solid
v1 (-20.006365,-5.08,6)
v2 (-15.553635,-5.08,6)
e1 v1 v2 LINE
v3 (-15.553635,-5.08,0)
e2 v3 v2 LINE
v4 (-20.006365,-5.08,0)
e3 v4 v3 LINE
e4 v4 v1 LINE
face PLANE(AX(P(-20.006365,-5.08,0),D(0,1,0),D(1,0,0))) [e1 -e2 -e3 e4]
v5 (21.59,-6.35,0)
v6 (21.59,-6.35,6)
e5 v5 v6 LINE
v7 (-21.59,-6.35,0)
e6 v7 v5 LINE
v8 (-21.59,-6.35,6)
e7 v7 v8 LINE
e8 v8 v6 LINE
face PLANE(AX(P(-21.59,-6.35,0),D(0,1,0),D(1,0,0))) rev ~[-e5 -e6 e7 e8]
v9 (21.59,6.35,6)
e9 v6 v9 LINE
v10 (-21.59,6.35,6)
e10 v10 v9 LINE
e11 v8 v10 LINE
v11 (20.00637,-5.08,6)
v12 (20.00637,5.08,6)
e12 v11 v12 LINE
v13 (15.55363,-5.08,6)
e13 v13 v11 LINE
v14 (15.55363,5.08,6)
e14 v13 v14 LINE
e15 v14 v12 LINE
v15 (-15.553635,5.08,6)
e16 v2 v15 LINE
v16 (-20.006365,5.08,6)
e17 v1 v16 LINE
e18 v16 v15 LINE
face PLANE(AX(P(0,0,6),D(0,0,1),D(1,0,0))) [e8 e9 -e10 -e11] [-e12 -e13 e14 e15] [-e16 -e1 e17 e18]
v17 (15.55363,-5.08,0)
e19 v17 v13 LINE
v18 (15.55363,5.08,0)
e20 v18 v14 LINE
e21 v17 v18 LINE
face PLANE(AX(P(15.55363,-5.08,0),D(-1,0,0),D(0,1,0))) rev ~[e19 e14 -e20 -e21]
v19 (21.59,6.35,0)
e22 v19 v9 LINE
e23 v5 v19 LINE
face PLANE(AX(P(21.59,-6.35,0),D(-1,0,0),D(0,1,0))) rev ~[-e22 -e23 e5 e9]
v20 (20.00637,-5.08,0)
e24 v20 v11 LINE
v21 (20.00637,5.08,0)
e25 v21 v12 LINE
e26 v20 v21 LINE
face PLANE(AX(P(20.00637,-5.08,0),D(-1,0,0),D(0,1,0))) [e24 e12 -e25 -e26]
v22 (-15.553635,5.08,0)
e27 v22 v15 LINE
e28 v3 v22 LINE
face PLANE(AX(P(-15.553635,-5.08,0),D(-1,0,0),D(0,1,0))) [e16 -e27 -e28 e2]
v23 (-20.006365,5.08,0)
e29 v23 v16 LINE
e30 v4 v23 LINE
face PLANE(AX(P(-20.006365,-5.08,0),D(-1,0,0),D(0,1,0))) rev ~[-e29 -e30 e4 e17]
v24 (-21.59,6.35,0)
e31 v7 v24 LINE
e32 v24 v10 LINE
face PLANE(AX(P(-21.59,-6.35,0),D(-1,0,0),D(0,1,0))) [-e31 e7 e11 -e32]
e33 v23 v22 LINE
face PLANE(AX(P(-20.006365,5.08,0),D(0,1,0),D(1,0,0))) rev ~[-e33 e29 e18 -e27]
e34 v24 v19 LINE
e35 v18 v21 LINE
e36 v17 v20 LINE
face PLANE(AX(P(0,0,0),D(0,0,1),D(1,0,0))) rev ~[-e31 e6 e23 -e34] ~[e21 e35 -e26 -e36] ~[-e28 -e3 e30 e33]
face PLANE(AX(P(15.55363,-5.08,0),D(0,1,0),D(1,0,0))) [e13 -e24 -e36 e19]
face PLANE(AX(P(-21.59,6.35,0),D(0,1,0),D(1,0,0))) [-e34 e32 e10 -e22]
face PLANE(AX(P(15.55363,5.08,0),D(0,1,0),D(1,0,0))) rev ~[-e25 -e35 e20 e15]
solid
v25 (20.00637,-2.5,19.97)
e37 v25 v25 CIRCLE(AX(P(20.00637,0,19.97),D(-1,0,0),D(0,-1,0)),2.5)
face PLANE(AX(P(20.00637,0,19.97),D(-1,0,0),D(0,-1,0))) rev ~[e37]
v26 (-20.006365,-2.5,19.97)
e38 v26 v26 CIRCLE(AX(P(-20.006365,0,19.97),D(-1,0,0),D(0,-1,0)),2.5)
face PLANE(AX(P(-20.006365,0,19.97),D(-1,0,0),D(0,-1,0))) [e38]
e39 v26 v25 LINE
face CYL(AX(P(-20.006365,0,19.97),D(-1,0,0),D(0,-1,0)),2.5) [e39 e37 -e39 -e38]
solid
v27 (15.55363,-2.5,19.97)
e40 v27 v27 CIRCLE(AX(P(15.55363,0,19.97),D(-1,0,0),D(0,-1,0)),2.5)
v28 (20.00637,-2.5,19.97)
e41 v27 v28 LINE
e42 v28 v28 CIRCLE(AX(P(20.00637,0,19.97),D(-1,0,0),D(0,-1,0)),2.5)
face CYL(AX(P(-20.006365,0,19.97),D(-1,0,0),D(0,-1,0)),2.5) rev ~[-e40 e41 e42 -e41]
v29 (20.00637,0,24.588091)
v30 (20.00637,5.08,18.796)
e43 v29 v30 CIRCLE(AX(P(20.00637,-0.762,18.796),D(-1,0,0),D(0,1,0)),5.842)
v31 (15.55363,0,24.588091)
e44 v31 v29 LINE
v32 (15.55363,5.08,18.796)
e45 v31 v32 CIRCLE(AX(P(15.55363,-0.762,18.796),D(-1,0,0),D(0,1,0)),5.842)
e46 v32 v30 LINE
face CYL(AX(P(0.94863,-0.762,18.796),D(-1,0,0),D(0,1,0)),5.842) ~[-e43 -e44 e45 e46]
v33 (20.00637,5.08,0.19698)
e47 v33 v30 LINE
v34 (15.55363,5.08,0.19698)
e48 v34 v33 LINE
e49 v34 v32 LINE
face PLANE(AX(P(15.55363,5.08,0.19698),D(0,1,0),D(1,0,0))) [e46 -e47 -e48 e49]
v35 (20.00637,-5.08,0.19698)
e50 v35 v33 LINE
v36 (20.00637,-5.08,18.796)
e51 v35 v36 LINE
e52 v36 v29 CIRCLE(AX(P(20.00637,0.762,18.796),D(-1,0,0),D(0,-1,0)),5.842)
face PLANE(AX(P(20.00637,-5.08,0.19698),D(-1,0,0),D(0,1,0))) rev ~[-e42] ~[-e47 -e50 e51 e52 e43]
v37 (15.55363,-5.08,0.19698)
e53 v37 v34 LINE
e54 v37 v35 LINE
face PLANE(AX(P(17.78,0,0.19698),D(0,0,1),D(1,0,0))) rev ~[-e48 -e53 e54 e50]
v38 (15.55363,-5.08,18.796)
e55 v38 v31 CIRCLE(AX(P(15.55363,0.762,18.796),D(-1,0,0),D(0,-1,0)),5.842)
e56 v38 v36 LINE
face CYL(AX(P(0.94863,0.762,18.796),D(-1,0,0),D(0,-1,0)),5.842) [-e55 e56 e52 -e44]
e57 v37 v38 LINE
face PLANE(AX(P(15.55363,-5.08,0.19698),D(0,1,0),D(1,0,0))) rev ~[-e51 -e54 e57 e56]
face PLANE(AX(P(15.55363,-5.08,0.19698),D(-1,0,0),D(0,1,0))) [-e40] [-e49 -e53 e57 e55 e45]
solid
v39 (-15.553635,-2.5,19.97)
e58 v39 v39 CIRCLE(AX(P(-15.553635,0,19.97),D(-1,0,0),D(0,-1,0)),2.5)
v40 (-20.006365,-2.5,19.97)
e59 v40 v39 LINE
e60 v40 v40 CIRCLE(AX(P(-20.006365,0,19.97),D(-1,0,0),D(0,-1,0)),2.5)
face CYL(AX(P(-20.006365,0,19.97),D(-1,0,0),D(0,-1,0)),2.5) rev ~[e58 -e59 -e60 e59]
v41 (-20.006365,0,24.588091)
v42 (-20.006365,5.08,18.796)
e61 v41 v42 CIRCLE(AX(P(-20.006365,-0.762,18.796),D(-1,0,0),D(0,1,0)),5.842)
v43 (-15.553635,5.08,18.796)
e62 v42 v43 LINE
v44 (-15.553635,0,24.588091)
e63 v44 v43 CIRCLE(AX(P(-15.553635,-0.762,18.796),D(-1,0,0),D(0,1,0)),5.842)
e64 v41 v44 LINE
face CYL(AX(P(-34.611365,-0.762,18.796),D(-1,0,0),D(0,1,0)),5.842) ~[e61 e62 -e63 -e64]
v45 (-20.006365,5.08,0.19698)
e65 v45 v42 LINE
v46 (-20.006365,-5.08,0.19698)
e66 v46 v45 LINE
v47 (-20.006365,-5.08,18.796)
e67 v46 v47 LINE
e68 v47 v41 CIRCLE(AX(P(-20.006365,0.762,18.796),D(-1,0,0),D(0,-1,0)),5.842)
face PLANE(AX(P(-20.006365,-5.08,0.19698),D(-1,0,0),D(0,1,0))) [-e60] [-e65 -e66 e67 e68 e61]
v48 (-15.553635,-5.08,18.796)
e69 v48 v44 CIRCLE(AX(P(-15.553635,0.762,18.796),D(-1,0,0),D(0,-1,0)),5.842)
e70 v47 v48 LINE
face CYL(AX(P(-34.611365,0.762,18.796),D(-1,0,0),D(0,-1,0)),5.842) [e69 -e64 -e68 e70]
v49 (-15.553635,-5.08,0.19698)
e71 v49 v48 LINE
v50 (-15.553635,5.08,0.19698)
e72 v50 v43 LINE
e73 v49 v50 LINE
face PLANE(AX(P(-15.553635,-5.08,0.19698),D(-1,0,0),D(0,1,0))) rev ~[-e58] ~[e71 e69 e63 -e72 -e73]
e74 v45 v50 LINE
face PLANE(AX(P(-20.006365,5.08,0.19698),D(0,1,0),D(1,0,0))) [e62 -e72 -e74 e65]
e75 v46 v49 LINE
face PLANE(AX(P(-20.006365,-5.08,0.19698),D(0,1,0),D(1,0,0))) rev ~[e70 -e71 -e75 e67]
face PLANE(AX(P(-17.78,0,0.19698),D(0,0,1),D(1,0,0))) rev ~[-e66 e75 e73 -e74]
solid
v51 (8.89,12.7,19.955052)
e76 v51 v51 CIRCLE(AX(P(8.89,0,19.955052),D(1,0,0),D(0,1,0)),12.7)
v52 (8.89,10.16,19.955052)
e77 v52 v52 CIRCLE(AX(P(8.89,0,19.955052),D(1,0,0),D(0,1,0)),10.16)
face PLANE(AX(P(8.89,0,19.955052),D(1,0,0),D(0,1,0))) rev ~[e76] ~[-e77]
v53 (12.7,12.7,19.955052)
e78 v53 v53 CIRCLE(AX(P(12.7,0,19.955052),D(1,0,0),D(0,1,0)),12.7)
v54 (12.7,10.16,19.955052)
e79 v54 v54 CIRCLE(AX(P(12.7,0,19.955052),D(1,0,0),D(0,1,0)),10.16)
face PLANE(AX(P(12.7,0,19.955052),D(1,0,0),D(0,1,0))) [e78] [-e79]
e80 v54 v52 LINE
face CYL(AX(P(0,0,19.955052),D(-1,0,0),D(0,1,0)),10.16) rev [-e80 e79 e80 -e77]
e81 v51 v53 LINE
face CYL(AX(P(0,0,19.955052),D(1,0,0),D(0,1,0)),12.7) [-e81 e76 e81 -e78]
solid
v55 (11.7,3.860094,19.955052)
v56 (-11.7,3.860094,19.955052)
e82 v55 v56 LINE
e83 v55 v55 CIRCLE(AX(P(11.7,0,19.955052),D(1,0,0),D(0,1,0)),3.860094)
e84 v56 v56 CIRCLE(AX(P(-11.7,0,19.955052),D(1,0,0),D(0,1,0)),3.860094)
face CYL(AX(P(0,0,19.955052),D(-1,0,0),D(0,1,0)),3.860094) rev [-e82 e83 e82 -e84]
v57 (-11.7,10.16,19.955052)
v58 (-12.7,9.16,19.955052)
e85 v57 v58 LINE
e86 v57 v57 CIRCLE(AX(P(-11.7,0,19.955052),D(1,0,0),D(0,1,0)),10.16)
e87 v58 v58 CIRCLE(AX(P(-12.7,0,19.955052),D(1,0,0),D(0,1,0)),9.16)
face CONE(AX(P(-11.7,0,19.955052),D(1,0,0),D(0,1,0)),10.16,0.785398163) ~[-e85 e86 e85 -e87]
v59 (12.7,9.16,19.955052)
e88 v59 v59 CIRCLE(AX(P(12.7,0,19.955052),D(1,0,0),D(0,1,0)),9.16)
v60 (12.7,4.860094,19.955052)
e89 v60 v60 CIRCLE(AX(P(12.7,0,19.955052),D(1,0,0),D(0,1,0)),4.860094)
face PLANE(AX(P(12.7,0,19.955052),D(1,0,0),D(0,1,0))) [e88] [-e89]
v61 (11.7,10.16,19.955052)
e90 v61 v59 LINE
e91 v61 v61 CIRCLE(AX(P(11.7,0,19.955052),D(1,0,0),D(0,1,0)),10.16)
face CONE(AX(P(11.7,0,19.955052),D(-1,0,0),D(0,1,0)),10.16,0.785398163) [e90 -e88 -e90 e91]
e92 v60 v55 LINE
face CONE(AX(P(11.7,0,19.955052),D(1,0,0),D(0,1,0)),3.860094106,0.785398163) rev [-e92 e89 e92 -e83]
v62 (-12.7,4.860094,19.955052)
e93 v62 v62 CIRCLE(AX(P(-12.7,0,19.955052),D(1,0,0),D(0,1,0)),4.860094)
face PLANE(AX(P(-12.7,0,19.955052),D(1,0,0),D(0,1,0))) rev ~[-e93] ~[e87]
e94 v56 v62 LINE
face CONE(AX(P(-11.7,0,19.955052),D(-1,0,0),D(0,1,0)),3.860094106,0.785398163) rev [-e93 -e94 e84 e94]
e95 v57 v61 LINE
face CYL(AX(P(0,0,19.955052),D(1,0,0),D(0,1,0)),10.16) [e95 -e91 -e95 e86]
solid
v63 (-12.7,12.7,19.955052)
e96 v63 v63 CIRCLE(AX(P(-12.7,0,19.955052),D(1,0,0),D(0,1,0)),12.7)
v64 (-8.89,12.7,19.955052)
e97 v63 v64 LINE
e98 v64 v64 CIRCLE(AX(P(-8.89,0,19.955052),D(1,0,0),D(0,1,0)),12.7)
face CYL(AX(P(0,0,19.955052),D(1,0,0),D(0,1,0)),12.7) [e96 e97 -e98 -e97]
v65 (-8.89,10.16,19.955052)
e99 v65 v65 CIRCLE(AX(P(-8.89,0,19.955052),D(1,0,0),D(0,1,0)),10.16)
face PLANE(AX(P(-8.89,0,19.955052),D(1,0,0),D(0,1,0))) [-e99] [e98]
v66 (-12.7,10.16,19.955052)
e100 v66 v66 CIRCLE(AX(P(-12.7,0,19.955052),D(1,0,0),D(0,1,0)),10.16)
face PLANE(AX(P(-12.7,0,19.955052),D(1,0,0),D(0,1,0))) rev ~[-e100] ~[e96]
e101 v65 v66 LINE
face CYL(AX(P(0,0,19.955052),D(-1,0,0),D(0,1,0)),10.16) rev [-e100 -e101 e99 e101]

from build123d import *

# Parameters (mm, degrees)
F0_W          = 43.18
F0_H          = 12.7
F0_W_2        = 4.4527295977
F0_H_2        = 10.16
F0_W_3        = 4.4527407736
F1_DEPTH      = 6
F2_START      = 0.19698
F2_DEPTH      = 24.44102
F3_T1_DEPTH   = 33.6627407736
F3_2_T1_DEPTH = 33.6627295977
F4_R          = 2.5
F5_DEPTH      = 40.0127351856
F6_DEPTH      = 40.0127351856
F7_R          = 12.7
F7_R_2        = 10.16
F8_DEPTH      = 12.7
F7_R_3        = 3.8600941061
F9_DEPTH      = 12.7
F10_DEPTH     = 8.89
F11_SIZE      = 1


# Not quite as in the source:
# - a fillet or chamfer that OpenCascade refuses, or shapes differently, is made with other operations: its cross-section is extruded or revolved along the edge and cut away or added


with BuildPart() as f1:
    # F0 (on Top) → F1 (new body)
    with BuildSketch(Plane.XY):
        Rectangle(F0_W, F0_H)
        with Locations((-17.78, 0)):
            Rectangle(F0_W_2, F0_H_2, mode=Mode.SUBTRACT)
        with Locations((17.78, 0)):
            Rectangle(F0_W_3, F0_H_2, mode=Mode.SUBTRACT)
    extrude(amount=F1_DEPTH)


with BuildPart() as f2:
    # F0 (on Top) → F2 (new body)
    with BuildSketch(Plane.XY.offset(F2_START)):
        with Locations((-17.78, 0)):
            Rectangle(F0_W_2, F0_H_2)
    extrude(amount=F2_DEPTH)

    # F3#2: fillet of radius 5.842 on 2 edges, made by hand

    # F3_2_s2 → F3_2_t1 (cut)
    with BuildSketch(Plane.YZ.offset(-34.6113647988)):
        with BuildLine():
            ThreePointArc((5.08, 18.796), (3.3689178157, 22.9269178157), (-0.762, 24.638))
            Line((-0.762, 24.638), (5.08, 24.638))
            Line((5.08, 24.638), (5.08, 18.796))
        make_face()
        with BuildLine():
            ThreePointArc((-5.08, 18.796), (-3.3689178157, 22.9269178157), (0.762, 24.638))
            Line((0.762, 24.638), (-5.08, 24.638))
            Line((-5.08, 24.638), (-5.08, 18.796))
        make_face()
    extrude(amount=F3_2_T1_DEPTH, mode=Mode.SUBTRACT)


with BuildPart() as f2b:
    # F0 (on Top) → F2, piece 2 (new body)
    with BuildSketch(Plane.XY.offset(F2_START)):
        with Locations((17.78, 0)):
            Rectangle(F0_W_3, F0_H_2)
    extrude(amount=F2_DEPTH)

    # F3: fillet of radius 5.842 on 2 edges, made by hand

    # F3_s2 → F3_t1 (cut)
    with BuildSketch(Plane.YZ.offset(0.9486296132)):
        with BuildLine():
            ThreePointArc((5.08, 18.796), (3.3689178157, 22.9269178157), (-0.762, 24.638))
            Line((-0.762, 24.638), (5.08, 24.638))
            Line((5.08, 24.638), (5.08, 18.796))
        make_face()
        with BuildLine():
            ThreePointArc((-5.08, 18.796), (-3.3689178157, 22.9269178157), (0.762, 24.638))
            Line((0.762, 24.638), (-5.08, 24.638))
            Line((-5.08, 24.638), (-5.08, 18.796))
        make_face()
    extrude(amount=F3_T1_DEPTH, mode=Mode.SUBTRACT)


with BuildPart() as f5_tool:
    # F4 (on face) → F5 (new body, through all)
    with BuildSketch(Plane(origin=(-20.0063647988, 0, 0), x_dir=(0, -1, 0), z_dir=(-1, 0, 0))):
        with Locations((0, 19.97)):
            Circle(F4_R)
    extrude(amount=-F5_DEPTH)


with BuildPart() as f2_1:
    add(f2.part)

    # F5: cut by f5_tool
    add(f5_tool.part, mode=Mode.SUBTRACT)


with BuildPart() as f2b_1:
    add(f2b.part)

    # F5: cut by f5_tool
    add(f5_tool.part, mode=Mode.SUBTRACT)


with BuildPart() as f6:
    # F4 (on face) → F6 (new body, through all)
    with BuildSketch(Plane(origin=(-20.0063647988, 0, 0), x_dir=(0, -1, 0), z_dir=(-1, 0, 0))):
        with Locations((0, 19.97)):
            Circle(F4_R)
    extrude(amount=-F6_DEPTH)


with BuildPart() as f8:
    # F7 (on Right) → F8 (new body, symmetric)
    with BuildSketch(Plane.YZ):
        with Locations((0, 19.9550520629)):
            Circle(F7_R)
        with Locations((0, 19.9550520629)):
            Circle(F7_R_2, mode=Mode.SUBTRACT)
    extrude(amount=F8_DEPTH, both=True)

    # F7 (on Right) → F10 (cut, symmetric)
    with BuildSketch(Plane.YZ):
        with Locations((0, 19.9550520629)):
            Circle(F7_R)
        with Locations((0, 19.9550520629)):
            Circle(F7_R_2, mode=Mode.SUBTRACT)
    extrude(amount=F10_DEPTH, both=True, mode=Mode.SUBTRACT)


with BuildPart() as f9:
    # F7 (on Right) → F9 (new body, symmetric)
    with BuildSketch(Plane.YZ):
        with Locations((0, 19.9550520629)):
            Circle(F7_R_2)
        with Locations((0, 19.9550520629)):
            Circle(F7_R_3, mode=Mode.SUBTRACT)
    extrude(amount=F9_DEPTH, both=True)

    # F11
    f11_edges = [f9.edges().sort_by_distance(p)[0] for p in [
        (12.7, -3.860094, 19.955052),
        (-12.7, -3.860094, 19.955052),
        (12.7, -10.16, 19.955052),
        (-12.7, -10.16, 19.955052),
        (0, 10.16, 19.955052),
    ]]
    chamfer(f11_edges, length=F11_SIZE)


solid = Compound([f1.part, f2_1.part, f2b_1.part, f6.part, f8.part, f9.part])
